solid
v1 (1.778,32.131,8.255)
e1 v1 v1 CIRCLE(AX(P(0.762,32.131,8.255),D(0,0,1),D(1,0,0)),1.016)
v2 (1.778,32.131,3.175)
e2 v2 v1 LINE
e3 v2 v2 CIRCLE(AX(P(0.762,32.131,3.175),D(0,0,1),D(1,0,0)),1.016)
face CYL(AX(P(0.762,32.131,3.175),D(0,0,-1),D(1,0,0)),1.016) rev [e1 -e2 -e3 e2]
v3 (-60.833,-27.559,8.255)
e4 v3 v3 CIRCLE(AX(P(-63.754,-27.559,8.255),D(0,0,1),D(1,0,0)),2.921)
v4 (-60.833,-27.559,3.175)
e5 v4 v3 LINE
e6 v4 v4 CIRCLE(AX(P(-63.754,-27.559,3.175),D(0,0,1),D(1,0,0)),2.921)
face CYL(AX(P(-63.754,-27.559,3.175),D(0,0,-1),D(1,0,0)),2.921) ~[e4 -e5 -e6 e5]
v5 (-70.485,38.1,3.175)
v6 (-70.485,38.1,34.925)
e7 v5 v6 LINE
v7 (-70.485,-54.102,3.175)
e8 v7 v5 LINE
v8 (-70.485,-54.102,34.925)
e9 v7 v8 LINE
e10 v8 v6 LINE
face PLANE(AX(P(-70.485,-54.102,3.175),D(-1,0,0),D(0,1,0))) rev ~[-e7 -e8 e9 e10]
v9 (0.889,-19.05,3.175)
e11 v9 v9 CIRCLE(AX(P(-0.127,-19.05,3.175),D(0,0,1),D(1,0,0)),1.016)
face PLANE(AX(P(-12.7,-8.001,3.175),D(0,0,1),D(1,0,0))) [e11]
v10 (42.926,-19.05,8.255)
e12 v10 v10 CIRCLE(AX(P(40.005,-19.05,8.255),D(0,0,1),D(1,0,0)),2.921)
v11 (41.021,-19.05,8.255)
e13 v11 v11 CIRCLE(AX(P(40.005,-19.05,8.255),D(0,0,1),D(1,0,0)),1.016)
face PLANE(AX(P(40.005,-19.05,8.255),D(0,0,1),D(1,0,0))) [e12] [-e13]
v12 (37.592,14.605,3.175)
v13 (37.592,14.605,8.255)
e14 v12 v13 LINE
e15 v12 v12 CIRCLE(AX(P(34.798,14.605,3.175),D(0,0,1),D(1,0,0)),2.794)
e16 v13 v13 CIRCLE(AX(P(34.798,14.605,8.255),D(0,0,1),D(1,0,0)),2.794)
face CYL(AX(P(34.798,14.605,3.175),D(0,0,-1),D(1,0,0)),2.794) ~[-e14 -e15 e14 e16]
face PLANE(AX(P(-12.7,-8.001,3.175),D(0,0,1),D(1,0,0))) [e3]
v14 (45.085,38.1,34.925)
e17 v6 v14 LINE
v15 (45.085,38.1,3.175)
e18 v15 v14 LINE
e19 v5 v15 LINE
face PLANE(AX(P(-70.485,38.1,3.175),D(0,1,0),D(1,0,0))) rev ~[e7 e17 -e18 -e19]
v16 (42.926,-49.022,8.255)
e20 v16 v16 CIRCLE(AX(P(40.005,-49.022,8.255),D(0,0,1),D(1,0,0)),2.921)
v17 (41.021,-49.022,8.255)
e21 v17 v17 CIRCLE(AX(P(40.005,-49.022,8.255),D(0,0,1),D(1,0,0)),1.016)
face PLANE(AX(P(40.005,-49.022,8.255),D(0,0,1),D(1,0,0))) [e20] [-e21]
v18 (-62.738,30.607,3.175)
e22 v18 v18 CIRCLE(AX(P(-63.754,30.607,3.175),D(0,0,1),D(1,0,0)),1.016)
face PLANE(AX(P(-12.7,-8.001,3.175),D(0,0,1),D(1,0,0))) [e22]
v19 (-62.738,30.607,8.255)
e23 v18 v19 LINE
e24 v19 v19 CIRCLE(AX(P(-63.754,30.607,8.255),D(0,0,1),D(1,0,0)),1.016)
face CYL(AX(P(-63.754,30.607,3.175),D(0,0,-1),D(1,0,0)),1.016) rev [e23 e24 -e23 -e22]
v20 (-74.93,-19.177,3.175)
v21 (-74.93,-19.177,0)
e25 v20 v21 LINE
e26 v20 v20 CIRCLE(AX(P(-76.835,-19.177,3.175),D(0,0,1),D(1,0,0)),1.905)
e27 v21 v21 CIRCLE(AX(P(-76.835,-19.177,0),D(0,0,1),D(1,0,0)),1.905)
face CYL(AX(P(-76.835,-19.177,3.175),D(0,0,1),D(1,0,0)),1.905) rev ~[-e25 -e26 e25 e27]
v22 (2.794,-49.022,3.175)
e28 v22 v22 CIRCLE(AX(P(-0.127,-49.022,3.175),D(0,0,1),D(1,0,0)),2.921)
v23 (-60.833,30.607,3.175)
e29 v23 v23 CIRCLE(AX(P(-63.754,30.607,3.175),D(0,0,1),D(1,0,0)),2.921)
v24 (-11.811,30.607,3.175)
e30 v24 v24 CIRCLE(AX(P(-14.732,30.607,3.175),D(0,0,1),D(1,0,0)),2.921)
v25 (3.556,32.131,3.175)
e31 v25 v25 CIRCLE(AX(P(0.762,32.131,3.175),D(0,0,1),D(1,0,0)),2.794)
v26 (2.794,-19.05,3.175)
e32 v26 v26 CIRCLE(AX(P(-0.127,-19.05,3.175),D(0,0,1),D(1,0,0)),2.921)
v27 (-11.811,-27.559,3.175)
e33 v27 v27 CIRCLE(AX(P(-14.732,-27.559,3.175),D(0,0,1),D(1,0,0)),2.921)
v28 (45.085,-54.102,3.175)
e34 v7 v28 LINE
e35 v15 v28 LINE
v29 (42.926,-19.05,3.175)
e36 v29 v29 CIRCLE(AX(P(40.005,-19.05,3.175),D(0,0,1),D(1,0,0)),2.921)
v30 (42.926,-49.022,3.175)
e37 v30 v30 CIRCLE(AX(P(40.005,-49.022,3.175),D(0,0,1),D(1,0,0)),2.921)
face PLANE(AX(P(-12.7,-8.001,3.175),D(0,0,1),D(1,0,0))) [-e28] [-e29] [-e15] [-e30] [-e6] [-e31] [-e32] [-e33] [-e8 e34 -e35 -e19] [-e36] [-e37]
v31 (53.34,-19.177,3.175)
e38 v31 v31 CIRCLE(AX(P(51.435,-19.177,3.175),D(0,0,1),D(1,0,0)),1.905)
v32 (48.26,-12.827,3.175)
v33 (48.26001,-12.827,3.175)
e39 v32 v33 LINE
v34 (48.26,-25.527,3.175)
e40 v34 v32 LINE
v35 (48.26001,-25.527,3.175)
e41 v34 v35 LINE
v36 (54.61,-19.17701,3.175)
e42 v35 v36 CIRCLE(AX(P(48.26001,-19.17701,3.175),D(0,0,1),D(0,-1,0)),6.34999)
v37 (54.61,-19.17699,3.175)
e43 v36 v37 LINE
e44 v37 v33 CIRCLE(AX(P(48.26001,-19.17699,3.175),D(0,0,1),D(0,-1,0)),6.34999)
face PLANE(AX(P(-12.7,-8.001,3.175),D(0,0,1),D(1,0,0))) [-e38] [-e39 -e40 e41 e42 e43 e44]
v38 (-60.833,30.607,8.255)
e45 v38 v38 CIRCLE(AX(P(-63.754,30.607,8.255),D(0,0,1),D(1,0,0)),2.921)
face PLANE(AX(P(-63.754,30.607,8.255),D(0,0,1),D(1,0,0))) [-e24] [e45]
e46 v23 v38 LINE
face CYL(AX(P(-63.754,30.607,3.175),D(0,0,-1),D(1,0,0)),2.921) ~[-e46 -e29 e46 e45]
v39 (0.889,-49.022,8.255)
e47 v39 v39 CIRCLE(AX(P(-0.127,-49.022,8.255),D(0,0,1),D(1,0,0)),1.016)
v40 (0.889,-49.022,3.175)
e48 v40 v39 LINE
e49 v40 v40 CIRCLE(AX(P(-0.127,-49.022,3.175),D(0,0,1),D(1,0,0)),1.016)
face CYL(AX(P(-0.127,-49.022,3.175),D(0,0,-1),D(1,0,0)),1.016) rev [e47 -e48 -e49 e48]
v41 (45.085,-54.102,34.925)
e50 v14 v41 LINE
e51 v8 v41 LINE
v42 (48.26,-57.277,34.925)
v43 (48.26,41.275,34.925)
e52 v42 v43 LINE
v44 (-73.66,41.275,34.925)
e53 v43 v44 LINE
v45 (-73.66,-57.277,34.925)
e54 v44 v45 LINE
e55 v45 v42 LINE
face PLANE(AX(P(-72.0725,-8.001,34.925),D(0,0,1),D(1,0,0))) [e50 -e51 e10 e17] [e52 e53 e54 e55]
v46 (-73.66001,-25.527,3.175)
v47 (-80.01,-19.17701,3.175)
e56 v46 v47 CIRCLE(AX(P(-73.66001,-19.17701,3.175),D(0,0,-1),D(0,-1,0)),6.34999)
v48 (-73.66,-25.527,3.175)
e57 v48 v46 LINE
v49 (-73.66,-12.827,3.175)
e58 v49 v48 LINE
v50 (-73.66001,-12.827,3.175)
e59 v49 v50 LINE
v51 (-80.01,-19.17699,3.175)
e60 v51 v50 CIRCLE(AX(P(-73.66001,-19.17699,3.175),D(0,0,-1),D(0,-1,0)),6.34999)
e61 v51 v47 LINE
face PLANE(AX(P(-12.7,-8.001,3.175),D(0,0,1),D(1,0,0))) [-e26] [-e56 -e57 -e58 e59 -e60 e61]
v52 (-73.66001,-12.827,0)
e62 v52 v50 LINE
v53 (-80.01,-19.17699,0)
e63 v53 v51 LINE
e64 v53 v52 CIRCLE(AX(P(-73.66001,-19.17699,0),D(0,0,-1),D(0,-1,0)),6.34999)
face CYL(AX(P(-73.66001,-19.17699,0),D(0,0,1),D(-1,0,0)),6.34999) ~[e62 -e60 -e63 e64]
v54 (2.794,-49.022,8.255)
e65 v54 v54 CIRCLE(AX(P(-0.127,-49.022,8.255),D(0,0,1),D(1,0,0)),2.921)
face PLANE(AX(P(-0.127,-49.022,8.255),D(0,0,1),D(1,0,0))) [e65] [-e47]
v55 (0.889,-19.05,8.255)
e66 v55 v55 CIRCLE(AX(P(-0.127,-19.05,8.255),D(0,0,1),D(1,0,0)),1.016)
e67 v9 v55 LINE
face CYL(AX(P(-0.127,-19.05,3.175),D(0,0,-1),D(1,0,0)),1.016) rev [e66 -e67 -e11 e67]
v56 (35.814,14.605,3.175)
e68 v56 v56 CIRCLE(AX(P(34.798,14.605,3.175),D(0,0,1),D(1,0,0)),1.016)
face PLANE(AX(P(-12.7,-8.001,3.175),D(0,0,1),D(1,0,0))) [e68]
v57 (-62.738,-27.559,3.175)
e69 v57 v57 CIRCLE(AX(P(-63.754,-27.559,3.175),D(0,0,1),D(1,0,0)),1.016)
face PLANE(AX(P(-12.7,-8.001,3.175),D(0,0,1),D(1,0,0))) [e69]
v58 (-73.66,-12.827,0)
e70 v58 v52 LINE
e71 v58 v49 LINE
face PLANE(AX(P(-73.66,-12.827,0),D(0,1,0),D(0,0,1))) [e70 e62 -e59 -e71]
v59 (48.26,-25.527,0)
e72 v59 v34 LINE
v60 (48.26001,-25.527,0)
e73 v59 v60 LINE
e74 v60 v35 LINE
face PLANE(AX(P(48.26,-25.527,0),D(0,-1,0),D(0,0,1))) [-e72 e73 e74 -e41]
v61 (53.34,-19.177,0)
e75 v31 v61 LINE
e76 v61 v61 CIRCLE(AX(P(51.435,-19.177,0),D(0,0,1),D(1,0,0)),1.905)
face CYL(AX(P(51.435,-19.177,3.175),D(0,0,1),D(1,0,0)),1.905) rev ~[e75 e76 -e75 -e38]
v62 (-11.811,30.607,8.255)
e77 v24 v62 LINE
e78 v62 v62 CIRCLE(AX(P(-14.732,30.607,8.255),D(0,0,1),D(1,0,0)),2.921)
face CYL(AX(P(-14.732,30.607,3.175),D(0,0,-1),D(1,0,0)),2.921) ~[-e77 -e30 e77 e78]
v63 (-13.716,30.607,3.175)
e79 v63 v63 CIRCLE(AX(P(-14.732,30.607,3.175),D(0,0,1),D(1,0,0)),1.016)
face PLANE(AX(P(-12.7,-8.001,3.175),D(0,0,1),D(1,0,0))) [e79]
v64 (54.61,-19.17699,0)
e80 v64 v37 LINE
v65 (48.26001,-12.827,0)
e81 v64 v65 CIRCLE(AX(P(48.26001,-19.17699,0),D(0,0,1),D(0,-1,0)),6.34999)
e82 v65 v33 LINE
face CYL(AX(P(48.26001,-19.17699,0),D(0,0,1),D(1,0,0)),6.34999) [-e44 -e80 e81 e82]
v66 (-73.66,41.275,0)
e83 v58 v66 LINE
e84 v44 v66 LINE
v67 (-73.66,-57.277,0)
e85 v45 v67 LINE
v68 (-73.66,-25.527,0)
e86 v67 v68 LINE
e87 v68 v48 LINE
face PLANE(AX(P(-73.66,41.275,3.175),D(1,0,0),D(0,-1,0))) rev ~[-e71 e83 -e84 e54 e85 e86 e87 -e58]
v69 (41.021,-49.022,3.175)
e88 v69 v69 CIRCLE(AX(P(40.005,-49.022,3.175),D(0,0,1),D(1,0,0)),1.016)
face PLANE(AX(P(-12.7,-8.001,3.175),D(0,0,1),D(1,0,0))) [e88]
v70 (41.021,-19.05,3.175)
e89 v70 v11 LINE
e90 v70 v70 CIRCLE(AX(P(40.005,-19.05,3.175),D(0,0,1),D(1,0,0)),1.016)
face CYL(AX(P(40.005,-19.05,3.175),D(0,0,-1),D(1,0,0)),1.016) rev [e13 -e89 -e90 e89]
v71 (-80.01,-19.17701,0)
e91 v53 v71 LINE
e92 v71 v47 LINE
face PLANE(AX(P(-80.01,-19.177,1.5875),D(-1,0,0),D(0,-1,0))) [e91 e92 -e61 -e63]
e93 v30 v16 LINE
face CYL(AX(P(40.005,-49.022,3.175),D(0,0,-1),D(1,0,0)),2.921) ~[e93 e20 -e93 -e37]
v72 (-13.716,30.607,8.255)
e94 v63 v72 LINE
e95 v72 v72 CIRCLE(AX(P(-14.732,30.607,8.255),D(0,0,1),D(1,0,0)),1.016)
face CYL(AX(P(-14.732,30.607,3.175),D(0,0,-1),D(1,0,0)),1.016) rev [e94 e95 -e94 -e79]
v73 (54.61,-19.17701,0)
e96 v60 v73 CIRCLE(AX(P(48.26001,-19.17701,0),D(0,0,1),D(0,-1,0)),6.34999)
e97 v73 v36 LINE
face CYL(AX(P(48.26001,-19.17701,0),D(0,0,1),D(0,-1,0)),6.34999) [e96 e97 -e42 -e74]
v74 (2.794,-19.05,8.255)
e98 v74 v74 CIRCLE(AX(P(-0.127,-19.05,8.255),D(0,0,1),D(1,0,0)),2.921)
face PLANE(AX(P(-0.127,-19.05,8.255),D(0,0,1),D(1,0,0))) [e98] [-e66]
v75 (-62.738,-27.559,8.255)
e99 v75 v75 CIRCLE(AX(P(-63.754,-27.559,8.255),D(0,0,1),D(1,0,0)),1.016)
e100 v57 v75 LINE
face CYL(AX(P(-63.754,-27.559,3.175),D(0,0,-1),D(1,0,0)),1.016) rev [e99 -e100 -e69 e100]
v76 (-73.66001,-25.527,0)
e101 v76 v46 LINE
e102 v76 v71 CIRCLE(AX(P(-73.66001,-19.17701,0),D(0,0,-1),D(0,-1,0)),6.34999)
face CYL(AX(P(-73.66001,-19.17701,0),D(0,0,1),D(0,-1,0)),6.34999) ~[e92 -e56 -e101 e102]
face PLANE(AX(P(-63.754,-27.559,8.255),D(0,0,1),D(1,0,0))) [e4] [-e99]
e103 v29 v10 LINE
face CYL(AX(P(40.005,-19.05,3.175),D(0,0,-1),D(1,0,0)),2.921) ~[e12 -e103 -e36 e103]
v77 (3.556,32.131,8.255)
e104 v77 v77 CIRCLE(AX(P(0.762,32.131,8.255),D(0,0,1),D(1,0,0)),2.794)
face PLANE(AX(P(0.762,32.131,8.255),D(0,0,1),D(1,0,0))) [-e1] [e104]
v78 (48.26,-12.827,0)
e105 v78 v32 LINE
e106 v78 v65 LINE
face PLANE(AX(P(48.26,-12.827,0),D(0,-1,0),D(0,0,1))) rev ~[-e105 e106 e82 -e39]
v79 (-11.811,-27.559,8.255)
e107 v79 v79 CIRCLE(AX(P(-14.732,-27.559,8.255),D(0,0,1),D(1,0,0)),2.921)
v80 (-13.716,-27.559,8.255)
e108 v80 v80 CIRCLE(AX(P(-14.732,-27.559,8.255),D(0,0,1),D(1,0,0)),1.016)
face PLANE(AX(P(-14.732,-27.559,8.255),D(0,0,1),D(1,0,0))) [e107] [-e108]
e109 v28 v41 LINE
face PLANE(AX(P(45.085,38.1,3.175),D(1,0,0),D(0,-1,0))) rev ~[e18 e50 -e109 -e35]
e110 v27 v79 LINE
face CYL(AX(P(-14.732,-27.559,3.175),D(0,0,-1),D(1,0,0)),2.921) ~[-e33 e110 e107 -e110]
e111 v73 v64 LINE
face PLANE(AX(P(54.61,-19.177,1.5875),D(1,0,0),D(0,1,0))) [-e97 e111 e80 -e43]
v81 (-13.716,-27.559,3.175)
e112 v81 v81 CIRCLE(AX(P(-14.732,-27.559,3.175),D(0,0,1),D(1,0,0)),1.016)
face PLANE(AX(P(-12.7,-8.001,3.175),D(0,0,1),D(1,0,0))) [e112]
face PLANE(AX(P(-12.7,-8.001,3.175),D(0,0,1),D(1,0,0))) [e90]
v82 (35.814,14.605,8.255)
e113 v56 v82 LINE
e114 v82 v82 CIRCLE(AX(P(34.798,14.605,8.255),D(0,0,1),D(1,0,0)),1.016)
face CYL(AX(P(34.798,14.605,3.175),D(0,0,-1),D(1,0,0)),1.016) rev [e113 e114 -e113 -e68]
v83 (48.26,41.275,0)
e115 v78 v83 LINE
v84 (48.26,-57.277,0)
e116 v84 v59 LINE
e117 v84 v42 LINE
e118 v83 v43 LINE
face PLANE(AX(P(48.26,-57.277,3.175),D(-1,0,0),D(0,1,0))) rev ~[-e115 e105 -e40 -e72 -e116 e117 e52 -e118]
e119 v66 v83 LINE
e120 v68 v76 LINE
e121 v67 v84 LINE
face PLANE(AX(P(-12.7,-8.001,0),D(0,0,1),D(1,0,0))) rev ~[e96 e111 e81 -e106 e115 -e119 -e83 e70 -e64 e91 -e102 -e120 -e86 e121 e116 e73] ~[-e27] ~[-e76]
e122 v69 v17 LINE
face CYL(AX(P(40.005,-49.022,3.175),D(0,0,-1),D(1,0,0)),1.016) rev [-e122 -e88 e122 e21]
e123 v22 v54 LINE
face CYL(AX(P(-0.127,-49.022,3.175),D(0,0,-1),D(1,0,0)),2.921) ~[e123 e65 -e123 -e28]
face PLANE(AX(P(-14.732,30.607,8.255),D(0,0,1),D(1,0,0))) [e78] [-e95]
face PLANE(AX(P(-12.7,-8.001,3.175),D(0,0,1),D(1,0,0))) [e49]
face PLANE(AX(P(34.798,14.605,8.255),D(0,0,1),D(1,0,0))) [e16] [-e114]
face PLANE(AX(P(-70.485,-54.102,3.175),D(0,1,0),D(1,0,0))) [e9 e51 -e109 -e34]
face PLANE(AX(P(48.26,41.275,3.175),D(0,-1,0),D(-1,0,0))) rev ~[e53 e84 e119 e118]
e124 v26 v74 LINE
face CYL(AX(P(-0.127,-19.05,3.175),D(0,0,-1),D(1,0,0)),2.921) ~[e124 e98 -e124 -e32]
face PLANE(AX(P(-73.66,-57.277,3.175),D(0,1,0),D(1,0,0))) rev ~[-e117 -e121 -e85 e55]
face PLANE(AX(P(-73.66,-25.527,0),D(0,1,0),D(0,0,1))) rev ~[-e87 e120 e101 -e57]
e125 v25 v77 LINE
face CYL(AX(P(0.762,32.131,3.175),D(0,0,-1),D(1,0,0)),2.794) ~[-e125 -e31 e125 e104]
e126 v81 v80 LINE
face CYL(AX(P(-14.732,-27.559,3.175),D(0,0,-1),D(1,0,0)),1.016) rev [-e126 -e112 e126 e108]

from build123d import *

# Parameters (mm, degrees)
F0_W      = 121.92
F0_H      = 98.552
F1_DEPTH  = 3.175
F2_W      = 12.7
F2_H      = 3.175
F3_DEPTH  = 6.35
F4_W      = 12.7
F4_H      = 3.175
F5_DEPTH  = 6.35
F6_R      = 6.34999
F7_R      = 1.905
F8_DEPTH  = 6.35
F9_W      = 115.57
F9_H      = 3.175
F10_DEPTH = 31.75
F11_R     = 2.921
F11_R_2   = 1.016
F12_R     = 2.794
F12_R_2   = 1.016
F13_R     = 2.921
F13_R_2   = 1.016
F14_DEPTH = 5.08


# Not quite as in the source:
# - a fillet or chamfer is up to 0.001 mm smaller than in the source, because OpenCascade refuses the exact size
# - a feature names something its author has since deleted; it is built from what else it names


with BuildPart() as f1:
    # F0 (on Top) → F1 (new body)
    with BuildSketch(Plane.XY):
        with Locations((-12.7, -8.001)):
            Rectangle(F0_W, F0_H)
    extrude(amount=F1_DEPTH)

    # F2 (on face) → F3 (join)
    with BuildSketch(Plane.YZ.offset(48.26)):
        with Locations((-19.177, 1.5875)):
            Rectangle(F2_W, F2_H)
    extrude(amount=F3_DEPTH)

    # F4 (on face) → F5 (join)
    with BuildSketch(Plane(origin=(-73.66, 0, 0), x_dir=(0, -1, 0), z_dir=(-1, 0, 0))):
        with Locations((19.177, 1.5875)):
            Rectangle(F4_W, F4_H)
    extrude(amount=F5_DEPTH)

    # F6 (radius 6.35 in the source; OpenCascade refuses exactly that, so slightly less here)
    f6_edges = [f1.edges().sort_by_distance(p)[0] for p in [
        (-80.01, -25.527, 1.5875),
        (-80.01, -12.827, 1.5875),
        (54.61, -25.527, 1.5875),
        (54.61, -12.827, 1.5875),
    ]]
    fillet(f6_edges, radius=F6_R)

    # F7 (on face) → F8 (cut)
    with BuildSketch(Plane.XY.offset(3.175)):
        with Locations((-76.835, -19.177)):
            Circle(F7_R)
        with Locations((51.435, -19.177)):
            Circle(F7_R)
    extrude(amount=-F8_DEPTH, mode=Mode.SUBTRACT)

    # F9 (on face) → F10 (join)
    with BuildSketch(Plane.XY.offset(3.175)):
        Polygon((-73.66, -57.277), (-70.485, -57.277), (-70.485, -54.102), (-70.485, 38.1), (-70.485, 41.275), (-73.66, 41.275), (-73.66, -12.827), (-73.66, -25.527), align=None)
        with Locations((-12.7, -55.6895)):
            Rectangle(F9_W, F9_H)
        with Locations((-12.7, 39.6875)):
            Rectangle(F9_W, F9_H)
        Polygon((45.085, -57.277), (48.26, -57.277), (48.26, -25.527), (48.26, -12.827), (48.26, 41.275), (45.085, 41.275), (45.085, 38.1), (45.085, -54.102), align=None)
    extrude(amount=F10_DEPTH)

    # F11 (on face) + F12 (on face) + F13 (on face) → F14 (join)
    with BuildSketch(Plane.XY.offset(3.175)):
        with Locations((-63.754, 30.607)):
            Circle(F11_R)
        with Locations((-63.754, 30.607)):
            Circle(F11_R_2, mode=Mode.SUBTRACT)
        with Locations((-14.732, -27.559)):
            Circle(F11_R)
        with Locations((-14.732, -27.559)):
            Circle(F11_R_2, mode=Mode.SUBTRACT)
        with Locations((-14.732, 30.607)):
            Circle(F11_R)
        with Locations((-14.732, 30.607)):
            Circle(F11_R_2, mode=Mode.SUBTRACT)
        with Locations((-63.754, -27.559)):
            Circle(F11_R)
        with Locations((-63.754, -27.559)):
            Circle(F11_R_2, mode=Mode.SUBTRACT)
    with BuildSketch(Plane.XY.offset(3.175)):
        with Locations((34.798, 14.605)):
            Circle(F12_R)
        with Locations((34.798, 14.605)):
            Circle(F12_R_2, mode=Mode.SUBTRACT)
        with Locations((0.762, 32.131)):
            Circle(F12_R)
        with Locations((0.762, 32.131)):
            Circle(F12_R_2, mode=Mode.SUBTRACT)
    with BuildSketch(Plane.XY.offset(3.175)):
        with Locations((40.005, -19.05)):
            Circle(F13_R)
        with Locations((40.005, -19.05)):
            Circle(F13_R_2, mode=Mode.SUBTRACT)
        with Locations((40.005, -49.022)):
            Circle(F13_R)
        with Locations((40.005, -49.022)):
            Circle(F13_R_2, mode=Mode.SUBTRACT)
        with Locations((-0.127, -49.022)):
            Circle(F13_R)
        with Locations((-0.127, -49.022)):
            Circle(F13_R_2, mode=Mode.SUBTRACT)
        with Locations((-0.127, -19.05)):
            Circle(F13_R)
        with Locations((-0.127, -19.05)):
            Circle(F13_R_2, mode=Mode.SUBTRACT)
    extrude(amount=F14_DEPTH)


solid = f1.part
